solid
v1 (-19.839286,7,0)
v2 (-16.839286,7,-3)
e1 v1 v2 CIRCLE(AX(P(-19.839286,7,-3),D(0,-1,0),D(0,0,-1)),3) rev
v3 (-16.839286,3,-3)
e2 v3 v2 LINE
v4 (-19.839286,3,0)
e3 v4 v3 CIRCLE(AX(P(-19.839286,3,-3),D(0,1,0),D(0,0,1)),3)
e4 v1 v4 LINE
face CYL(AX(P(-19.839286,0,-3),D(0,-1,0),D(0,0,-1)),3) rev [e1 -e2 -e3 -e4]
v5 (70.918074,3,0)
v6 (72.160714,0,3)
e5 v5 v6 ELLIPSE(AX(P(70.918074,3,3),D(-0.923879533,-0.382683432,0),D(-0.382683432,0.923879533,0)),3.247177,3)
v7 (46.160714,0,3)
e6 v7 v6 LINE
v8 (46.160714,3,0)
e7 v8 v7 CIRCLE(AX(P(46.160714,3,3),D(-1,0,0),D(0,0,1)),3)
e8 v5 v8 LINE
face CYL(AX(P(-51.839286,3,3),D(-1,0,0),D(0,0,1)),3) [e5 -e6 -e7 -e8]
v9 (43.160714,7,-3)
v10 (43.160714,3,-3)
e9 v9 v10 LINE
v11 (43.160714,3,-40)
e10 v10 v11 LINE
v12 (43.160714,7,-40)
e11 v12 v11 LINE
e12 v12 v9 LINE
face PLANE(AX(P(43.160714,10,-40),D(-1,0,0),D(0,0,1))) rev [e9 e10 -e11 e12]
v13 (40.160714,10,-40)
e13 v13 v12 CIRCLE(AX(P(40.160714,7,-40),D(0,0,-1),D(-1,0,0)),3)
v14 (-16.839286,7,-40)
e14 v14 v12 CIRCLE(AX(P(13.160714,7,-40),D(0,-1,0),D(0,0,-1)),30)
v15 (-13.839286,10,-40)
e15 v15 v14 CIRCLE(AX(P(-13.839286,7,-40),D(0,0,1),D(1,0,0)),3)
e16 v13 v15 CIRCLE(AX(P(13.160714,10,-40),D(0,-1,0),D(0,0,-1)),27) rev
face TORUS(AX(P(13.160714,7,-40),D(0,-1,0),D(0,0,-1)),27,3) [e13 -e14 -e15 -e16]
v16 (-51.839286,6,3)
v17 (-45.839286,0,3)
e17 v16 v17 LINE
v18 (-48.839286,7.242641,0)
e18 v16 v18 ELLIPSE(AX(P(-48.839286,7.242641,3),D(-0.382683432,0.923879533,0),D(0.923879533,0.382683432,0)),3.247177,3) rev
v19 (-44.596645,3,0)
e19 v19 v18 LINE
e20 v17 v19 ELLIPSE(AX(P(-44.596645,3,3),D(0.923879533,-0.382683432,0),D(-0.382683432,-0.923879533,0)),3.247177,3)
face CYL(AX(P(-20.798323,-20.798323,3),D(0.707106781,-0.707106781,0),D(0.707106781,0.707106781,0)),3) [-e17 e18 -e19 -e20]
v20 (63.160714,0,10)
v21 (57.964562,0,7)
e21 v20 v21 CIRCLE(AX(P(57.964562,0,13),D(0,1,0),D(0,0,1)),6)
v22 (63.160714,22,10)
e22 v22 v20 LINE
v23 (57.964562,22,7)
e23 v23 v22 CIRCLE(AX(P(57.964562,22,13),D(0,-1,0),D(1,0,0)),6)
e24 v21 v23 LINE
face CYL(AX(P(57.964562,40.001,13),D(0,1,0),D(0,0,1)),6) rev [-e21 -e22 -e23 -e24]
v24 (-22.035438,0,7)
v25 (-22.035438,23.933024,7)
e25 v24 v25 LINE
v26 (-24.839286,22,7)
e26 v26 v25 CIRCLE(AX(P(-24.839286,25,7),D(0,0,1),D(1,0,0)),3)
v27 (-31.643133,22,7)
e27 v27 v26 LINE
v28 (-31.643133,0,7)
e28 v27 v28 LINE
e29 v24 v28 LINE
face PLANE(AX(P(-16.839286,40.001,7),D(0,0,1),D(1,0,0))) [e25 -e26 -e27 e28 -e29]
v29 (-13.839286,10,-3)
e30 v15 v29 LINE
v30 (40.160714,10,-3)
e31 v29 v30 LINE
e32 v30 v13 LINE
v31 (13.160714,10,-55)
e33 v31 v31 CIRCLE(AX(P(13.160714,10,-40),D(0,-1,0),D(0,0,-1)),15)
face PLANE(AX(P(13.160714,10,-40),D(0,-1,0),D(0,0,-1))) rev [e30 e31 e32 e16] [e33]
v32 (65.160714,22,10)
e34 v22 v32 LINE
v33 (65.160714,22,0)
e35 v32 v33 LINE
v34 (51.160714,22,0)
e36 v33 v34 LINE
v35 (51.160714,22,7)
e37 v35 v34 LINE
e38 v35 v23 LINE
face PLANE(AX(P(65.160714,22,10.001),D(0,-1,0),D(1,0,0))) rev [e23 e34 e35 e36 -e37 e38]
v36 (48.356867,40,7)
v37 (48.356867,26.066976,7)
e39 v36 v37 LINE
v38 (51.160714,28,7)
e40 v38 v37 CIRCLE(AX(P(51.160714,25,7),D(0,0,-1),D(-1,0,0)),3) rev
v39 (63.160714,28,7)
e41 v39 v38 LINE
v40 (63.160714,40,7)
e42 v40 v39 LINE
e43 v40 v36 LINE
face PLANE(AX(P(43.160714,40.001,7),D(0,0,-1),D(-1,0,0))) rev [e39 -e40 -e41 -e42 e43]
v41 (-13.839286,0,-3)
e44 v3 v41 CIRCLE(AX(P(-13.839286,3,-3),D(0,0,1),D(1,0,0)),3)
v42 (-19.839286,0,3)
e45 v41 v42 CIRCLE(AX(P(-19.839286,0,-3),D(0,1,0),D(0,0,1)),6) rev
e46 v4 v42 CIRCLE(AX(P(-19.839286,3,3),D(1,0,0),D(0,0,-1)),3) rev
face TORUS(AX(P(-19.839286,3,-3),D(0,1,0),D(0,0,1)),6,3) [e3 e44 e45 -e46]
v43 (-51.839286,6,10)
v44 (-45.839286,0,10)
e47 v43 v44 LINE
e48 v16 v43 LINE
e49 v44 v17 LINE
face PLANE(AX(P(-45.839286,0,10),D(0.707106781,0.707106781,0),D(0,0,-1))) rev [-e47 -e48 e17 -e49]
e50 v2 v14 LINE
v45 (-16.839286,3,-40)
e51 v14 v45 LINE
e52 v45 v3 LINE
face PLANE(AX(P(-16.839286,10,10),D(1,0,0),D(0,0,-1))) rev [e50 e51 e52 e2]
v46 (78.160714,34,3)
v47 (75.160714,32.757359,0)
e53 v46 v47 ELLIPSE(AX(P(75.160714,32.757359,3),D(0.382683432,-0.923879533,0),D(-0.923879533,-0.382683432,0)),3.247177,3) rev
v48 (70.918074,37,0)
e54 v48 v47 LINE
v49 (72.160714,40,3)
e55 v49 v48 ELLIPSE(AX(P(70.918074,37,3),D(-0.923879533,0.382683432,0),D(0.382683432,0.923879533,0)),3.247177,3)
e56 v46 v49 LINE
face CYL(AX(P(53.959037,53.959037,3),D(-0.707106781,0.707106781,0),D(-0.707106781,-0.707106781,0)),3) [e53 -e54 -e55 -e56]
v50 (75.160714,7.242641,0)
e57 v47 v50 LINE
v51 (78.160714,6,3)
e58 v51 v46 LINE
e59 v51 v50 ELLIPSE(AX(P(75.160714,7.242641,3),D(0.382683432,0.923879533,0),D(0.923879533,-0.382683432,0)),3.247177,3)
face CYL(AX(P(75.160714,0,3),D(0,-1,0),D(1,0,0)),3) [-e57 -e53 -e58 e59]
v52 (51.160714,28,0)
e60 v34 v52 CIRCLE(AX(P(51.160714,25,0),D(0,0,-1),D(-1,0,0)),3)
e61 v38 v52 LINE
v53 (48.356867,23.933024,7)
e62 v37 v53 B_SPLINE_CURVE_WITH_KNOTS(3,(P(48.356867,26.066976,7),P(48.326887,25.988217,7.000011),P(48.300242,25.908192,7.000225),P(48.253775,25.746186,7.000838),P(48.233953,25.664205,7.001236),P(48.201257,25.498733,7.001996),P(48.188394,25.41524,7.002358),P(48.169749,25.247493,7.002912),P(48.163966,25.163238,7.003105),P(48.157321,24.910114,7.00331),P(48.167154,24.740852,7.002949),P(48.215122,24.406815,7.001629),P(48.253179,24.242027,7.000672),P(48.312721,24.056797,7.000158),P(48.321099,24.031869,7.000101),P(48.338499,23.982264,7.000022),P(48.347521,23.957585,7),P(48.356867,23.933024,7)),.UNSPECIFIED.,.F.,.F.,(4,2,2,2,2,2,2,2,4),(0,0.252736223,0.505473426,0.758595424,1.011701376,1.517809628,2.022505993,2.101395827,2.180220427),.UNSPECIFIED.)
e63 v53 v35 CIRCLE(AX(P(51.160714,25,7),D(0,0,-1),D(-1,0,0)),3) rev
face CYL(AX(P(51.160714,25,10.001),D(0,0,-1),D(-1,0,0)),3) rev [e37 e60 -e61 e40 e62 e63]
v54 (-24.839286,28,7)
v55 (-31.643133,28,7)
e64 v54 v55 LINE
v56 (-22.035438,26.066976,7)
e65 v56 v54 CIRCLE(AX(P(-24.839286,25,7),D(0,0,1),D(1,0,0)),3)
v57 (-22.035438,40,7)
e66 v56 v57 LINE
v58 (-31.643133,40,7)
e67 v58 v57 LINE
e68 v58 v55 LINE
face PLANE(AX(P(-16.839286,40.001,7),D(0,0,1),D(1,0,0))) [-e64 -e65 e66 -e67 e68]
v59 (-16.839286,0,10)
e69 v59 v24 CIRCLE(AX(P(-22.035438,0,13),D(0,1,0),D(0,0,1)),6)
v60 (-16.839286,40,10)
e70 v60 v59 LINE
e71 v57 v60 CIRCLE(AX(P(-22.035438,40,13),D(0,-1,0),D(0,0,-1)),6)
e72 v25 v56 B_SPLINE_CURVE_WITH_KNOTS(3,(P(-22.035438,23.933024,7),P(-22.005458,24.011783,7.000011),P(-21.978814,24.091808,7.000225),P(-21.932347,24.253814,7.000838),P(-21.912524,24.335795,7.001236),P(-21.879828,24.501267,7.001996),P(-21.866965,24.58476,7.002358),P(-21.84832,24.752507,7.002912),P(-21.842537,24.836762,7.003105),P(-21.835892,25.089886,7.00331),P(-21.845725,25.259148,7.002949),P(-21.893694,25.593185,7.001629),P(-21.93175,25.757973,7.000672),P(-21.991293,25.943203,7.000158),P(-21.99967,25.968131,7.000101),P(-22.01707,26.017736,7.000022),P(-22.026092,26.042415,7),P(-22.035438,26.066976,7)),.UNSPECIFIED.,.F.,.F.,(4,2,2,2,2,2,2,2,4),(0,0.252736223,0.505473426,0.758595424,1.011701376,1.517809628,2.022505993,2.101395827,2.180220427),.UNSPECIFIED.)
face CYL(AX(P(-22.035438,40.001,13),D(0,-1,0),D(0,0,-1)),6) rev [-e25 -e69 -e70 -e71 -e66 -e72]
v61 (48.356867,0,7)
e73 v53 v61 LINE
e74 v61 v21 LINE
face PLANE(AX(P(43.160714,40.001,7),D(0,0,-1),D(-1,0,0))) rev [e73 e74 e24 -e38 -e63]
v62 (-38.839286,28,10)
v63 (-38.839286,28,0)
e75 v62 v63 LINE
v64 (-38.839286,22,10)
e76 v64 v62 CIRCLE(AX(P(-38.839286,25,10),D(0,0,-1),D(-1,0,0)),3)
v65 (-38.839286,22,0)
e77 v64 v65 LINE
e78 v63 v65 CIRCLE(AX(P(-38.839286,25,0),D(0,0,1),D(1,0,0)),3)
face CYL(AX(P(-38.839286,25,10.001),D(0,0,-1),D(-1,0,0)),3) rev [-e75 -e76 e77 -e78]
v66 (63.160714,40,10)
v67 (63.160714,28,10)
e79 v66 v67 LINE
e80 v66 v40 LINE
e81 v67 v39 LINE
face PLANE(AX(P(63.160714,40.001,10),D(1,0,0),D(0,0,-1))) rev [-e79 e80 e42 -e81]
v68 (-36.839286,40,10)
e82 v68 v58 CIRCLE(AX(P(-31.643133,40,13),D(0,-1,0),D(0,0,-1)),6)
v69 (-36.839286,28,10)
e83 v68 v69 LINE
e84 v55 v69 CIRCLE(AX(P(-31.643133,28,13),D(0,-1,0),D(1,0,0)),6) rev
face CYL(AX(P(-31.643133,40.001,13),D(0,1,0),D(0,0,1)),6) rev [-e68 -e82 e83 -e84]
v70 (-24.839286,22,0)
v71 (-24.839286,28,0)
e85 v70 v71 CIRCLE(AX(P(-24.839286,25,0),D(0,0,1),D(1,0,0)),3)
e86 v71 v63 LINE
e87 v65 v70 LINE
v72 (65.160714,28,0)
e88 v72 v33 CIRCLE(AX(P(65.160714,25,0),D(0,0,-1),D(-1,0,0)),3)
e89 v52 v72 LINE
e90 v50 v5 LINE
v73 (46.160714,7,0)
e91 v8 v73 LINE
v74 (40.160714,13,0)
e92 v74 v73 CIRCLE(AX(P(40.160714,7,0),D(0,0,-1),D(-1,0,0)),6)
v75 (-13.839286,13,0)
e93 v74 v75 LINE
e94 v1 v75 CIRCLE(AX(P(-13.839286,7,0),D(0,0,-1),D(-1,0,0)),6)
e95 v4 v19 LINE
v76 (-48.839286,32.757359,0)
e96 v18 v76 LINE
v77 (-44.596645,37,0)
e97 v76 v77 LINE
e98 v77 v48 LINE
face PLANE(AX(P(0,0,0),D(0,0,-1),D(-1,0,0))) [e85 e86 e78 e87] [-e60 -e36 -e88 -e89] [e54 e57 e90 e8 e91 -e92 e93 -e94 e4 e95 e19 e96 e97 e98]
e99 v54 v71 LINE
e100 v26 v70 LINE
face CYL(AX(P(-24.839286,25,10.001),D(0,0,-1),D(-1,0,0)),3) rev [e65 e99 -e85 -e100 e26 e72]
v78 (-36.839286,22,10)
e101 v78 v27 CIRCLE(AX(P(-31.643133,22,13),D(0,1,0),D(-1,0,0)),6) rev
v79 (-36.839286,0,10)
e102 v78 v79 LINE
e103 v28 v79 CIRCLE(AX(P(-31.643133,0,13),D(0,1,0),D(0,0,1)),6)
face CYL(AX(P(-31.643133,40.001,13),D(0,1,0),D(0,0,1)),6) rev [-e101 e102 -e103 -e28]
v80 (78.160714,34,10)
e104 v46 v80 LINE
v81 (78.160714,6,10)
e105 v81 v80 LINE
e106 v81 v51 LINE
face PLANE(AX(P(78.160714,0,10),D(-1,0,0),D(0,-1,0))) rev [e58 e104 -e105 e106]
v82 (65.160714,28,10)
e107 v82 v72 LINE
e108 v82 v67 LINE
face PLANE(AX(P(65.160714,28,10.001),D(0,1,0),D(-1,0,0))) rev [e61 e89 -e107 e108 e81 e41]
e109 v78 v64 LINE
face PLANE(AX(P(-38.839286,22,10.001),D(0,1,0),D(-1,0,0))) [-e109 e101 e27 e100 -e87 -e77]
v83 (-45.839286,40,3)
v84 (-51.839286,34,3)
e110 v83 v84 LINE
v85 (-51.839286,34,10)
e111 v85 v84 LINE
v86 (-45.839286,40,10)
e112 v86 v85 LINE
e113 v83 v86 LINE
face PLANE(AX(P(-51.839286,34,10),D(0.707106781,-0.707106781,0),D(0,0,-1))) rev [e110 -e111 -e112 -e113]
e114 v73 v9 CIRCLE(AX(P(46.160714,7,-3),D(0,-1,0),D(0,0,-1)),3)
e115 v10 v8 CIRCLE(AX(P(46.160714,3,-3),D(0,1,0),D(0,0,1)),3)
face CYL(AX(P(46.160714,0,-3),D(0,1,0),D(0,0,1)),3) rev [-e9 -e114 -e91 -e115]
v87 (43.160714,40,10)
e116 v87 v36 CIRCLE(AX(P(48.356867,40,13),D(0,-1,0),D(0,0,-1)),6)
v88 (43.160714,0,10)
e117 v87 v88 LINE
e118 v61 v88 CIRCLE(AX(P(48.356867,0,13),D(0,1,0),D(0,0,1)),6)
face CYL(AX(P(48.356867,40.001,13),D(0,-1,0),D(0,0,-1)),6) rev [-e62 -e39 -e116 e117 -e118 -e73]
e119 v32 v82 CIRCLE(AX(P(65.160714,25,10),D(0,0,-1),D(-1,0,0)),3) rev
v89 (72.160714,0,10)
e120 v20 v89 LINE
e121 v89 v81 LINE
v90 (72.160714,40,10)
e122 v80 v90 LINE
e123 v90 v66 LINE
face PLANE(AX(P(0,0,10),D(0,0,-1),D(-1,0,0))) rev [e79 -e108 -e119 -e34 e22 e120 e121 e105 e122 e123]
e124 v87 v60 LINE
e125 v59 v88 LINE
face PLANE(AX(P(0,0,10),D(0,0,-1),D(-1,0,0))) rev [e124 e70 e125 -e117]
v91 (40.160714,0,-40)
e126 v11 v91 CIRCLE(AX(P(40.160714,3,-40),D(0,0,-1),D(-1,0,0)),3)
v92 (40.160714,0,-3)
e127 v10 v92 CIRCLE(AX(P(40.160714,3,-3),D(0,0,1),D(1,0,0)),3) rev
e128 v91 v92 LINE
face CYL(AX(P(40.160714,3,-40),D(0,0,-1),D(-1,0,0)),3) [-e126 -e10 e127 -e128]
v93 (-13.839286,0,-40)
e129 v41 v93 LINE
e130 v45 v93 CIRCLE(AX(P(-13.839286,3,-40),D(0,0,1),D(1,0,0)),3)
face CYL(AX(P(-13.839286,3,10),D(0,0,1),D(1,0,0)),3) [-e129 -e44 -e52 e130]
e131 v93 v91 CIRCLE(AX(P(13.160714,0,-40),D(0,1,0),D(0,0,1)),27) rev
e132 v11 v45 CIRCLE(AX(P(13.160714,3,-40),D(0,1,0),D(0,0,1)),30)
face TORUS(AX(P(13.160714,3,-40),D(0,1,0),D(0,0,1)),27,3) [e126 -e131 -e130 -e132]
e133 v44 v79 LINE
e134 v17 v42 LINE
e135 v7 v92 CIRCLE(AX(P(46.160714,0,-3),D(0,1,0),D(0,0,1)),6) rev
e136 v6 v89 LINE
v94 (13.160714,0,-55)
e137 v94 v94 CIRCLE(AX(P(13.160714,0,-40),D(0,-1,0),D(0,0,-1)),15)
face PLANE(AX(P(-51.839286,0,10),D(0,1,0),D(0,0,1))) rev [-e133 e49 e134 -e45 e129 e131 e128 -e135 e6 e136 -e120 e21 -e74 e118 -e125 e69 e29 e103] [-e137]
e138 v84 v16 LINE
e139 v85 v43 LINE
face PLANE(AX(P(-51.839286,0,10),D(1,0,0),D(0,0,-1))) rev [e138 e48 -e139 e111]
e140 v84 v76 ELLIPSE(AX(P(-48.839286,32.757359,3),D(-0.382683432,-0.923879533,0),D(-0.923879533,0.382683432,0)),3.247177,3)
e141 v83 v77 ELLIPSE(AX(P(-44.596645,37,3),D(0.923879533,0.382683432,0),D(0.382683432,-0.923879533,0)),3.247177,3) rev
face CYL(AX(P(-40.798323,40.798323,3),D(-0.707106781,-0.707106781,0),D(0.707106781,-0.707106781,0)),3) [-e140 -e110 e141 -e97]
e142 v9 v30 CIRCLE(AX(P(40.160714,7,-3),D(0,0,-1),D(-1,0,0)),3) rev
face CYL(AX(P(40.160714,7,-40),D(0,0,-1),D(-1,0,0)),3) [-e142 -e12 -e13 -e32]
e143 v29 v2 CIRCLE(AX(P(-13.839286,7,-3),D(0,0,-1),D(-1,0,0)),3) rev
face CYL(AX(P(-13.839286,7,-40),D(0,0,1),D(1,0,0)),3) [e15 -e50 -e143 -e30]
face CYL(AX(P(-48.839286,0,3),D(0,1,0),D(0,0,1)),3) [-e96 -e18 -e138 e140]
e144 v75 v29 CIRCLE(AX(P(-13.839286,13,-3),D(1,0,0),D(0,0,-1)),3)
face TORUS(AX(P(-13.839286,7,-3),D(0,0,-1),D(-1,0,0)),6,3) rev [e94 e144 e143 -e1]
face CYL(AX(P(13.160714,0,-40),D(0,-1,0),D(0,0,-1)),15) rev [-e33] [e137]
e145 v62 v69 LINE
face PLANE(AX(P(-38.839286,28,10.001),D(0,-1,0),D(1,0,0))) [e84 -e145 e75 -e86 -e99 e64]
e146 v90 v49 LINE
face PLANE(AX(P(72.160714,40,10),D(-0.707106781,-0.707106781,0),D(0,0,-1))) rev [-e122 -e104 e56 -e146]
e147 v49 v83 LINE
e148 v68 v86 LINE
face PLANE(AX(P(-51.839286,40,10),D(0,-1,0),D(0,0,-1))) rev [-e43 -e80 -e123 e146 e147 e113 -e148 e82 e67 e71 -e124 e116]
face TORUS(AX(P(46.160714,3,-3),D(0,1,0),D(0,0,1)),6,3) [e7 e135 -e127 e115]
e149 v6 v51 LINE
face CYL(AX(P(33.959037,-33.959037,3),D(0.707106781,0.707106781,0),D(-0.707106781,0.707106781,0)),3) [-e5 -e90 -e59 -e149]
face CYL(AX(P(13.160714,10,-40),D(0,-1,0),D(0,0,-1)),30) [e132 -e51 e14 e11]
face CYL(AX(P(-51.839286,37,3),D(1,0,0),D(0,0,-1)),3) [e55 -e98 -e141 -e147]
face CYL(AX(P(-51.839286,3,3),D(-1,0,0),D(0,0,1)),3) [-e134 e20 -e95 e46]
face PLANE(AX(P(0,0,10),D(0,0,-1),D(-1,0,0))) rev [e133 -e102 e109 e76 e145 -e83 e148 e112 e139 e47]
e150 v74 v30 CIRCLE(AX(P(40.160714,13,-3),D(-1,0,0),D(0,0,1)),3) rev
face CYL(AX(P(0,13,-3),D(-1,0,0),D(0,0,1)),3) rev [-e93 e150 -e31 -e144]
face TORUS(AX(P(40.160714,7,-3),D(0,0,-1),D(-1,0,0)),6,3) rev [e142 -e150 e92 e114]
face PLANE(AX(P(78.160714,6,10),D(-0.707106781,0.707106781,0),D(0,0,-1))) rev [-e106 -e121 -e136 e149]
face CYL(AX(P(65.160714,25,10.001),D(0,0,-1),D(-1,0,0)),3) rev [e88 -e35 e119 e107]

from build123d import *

# Parameters (mm, degrees)
ESQUISSE1_W             = 130
ESQUISSE1_H             = 40
BASE_DEPTH              = 10
CHANFREIN1_SIZE         = 6
CHANFREIN2_SIZE         = 6
LANGUETTE_EXT_DEPTH     = 10
D_GAGEMENT_M31_D        = 30
ENL_V_MAT_EXTRU_1_REACH = 114.29
ESQUISSE5_W             = 20
ESQUISSE5_H             = 3
RAINURE_REACH           = 114.29
CONGES3MM_R             = 3
CONGES6MM_R             = 6


with BuildPart() as part:
    # Esquisse1 → Base (new body)
    with BuildSketch(Plane.XY):
        with Locations((13.160714286, 20)):
            Rectangle(ESQUISSE1_W, ESQUISSE1_H)
    extrude(amount=BASE_DEPTH)

    # Chanfrein1
    chanfrein1_edges = [part.edges().sort_by_distance(p)[0] for p in [
        (78.160714286, 0, 5),
    ]]
    chamfer(chanfrein1_edges, length=CHANFREIN1_SIZE)

    # Chanfrein2
    chanfrein2_edges = [part.edges().sort_by_distance(p)[0] for p in [
        (-51.839285714, 40, 5),
        (78.160714286, 40, 5),
        (-51.839285714, 0, 5),
    ]]
    chamfer(chanfrein2_edges, length=CHANFREIN2_SIZE)

    # languette → Languette_Ext (add)
    with BuildSketch(Plane(origin=(0, 0, 0), x_dir=(1, 0, 0), z_dir=(0, 1, 0))):
        with BuildLine():
            Line((-16.839285714, -10), (-16.839285714, 40))
            ThreePointArc((-16.839285714, 40), (13.160714286, 70), (43.160714286, 40))
            Line((43.160714286, 40), (43.160714286, -10))
            Line((43.160714286, -10), (-16.839285714, -10))
        make_face()
    extrude(amount=LANGUETTE_EXT_DEPTH)

    # Dégagement M31 (through all)
    with Locations(Plane(origin=(0, 0, 0), x_dir=(-1, 0, 0), z_dir=(0, -1, 0))):
        with Locations((-13.160714286, 40)):
            Hole(D_GAGEMENT_M31_D / 2)

    # Esquisse5 → Enlèv. mat.-Extru.1 (cut, up to next)
    with BuildSketch(Plane.XZ, mode=Mode.PRIVATE) as enl_v_mat_extru_1_sk1:
        with Locations((53.160714286, 8.5)):
            Rectangle(ESQUISSE5_W, ESQUISSE5_H)
    enl_v_mat_extru_1_tool1 = extrude(enl_v_mat_extru_1_sk1.sketch, amount=-ENL_V_MAT_EXTRU_1_REACH, mode=Mode.PRIVATE) & part.part
    enl_v_mat_extru_1 = enl_v_mat_extru_1_tool1.solids().sort_by_distance((53.160714, 0, 8.5))[0]
    add(enl_v_mat_extru_1, mode=Mode.SUBTRACT)

    # Symétrie1: Enlèv. mat.-Extru.1 across plane
    add(enl_v_mat_extru_1.mirror(Plane(origin=(13.160714286, 0, 0), x_dir=(0, 0, 1), z_dir=(1, 0, 0))), mode=Mode.SUBTRACT)

    # Esquisse7 → Rainure (cut, up to next)
    with BuildSketch(Plane(origin=(0, 0, 0), x_dir=(-1, 0, 0), z_dir=(0, 0, -1)), mode=Mode.PRIVATE) as rainure_sk1:
        with BuildLine():
            Line((-65.160714286, 28), (-51.160714286, 28))
            ThreePointArc((-51.160714286, 28), (-48.160714286, 25), (-51.160714286, 22))
            Line((-51.160714286, 22), (-65.160714286, 22))
            ThreePointArc((-65.160714286, 22), (-68.160714286, 25), (-65.160714286, 28))
        make_face()
    rainure_tool1 = extrude(rainure_sk1.sketch, amount=-RAINURE_REACH, mode=Mode.PRIVATE) & part.part
    rainure = rainure_tool1.solids().sort_by_distance((58.160714, 25, 0))[0]
    add(rainure, mode=Mode.SUBTRACT)

    # Symétrie2: Rainure across plane
    add(rainure.mirror(Plane(origin=(13.160714286, 0, 0), x_dir=(0, 0, 1), z_dir=(1, 0, 0))), mode=Mode.SUBTRACT)

    # Conges3mm
    conges3mm_edges = [part.edges().sort_by_distance(p)[0] for p in [
        (78.160714286, 20, 0),
        (75.160714286, 3, 0),
        (-51.839285714, 20, 0),
        (-31.339285714, 0, 0),
        (13.160714286, 40, 0),
        (75.160714286, 37, 0),
        (-48.839285714, 3, 0),
        (-48.839285714, 37, 0),
        (57.660714286, 0, 0),
        (13.160714286, 10, 0),
        (-16.839285714, 5, 0),
        (43.160714286, 5, 0),
        (43.160714286, 0, -20),
        (13.160714286, 0, -70),
        (-16.839285714, 0, -20),
        (43.160714286, 10, -20),
        (13.160714286, 10, -70),
        (-16.839285714, 10, -20),
    ]]
    fillet(conges3mm_edges, radius=CONGES3MM_R)

    # Conges6mm
    # the kernel refuses this fillet: 6 mm, written as the material it adds along each edge
    with BuildSketch(Plane(origin=(-36.839285714, 15.009618943, 7), x_dir=(1, 0, 0), z_dir=(0, 1, 0))) as conges6mm_piece_1_section:
        with BuildLine():
            CenterArc((5.196152423, -6), CONGES6MM_R, 90, 60)
            Line((0, -3), (0, 0))
            Line((0, 0), (5.196152423, 0))
        make_face()
    conges6mm_piece_1 = extrude(amount=37.980762114, mode=Mode.PRIVATE)
    conges6mm_piece_1 = split(conges6mm_piece_1, bisect_by=Plane(origin=(-34.649133292, 22, 7.793455272), z_dir=(0, -1, 0)), keep=Keep.TOP, mode=Mode.PRIVATE)
    add(conges6mm_piece_1)
    with BuildSketch(Plane(origin=(-36.839285714, 28, 7), x_dir=(1, 0, 0), z_dir=(0, 1, 0))) as conges6mm_piece_2:
        with BuildLine():
            CenterArc((5.196152423, -6), CONGES6MM_R, 90, 60)
            Line((0, -3), (0, 0))
            Line((0, 0), (5.196152423, 0))
        make_face()
    extrude(amount=12)
    with BuildSketch(Plane(origin=(-36.839285714, 0, 7), x_dir=(1, 0, 0), z_dir=(0, 1, 0))) as conges6mm_piece_3:
        with BuildLine():
            CenterArc((5.196152423, -6), CONGES6MM_R, 90, 60)
            Line((0, -3), (0, 0))
            Line((0, 0), (5.196152423, 0))
        make_face()
    extrude(amount=22)
    with BuildSketch(Plane(origin=(-36.839285714, -12.990381057, 7), x_dir=(1, 0, 0), z_dir=(0, 1, 0))) as conges6mm_piece_4_section:
        with BuildLine():
            CenterArc((5.196152423, -6), CONGES6MM_R, 90, 60)
            Line((0, -3), (0, 0))
            Line((0, 0), (5.196152423, 0))
        make_face()
    conges6mm_piece_4 = extrude(amount=47.980762114, mode=Mode.PRIVATE)
    conges6mm_piece_4 = split(conges6mm_piece_4, bisect_by=Plane(origin=(-34.649133292, 28, 7.793455272), z_dir=(0, 1, 0)), keep=Keep.TOP, mode=Mode.PRIVATE)
    add(conges6mm_piece_4)
    with BuildSketch(Plane(origin=(-16.839285714, 0, 7), x_dir=(0, 0, 1), z_dir=(0, 1, 0))) as conges6mm_piece_5_section:
        with BuildLine():
            CenterArc((6, -5.196152423), CONGES6MM_R, 120, 60)
            Line((0, -5.196152423), (0, 0))
            Line((0, 0), (3, 0))
        make_face()
    conges6mm_piece_5 = extrude(amount=40, mode=Mode.PRIVATE)
    conges6mm_piece_5 = conges6mm_piece_5 - Plane(origin=(-24.839285714, 25, 7.793455272), x_dir=(0, 1, 0), z_dir=(0, 0, -1)) * Cylinder(3, 101, mode=Mode.PRIVATE)
    add(conges6mm_piece_5)
    with BuildSketch(Plane(origin=(43.160714286, 0, 7), x_dir=(1, 0, 0), z_dir=(0, 1, 0))) as conges6mm_piece_6_section:
        with BuildLine():
            CenterArc((5.196152423, -6), CONGES6MM_R, 90, 60)
            Line((0, -3), (0, 0))
            Line((0, 0), (5.196152423, 0))
        make_face()
    conges6mm_piece_6 = extrude(amount=40, mode=Mode.PRIVATE)
    conges6mm_piece_6 = conges6mm_piece_6 - Plane(origin=(51.160714286, 25, 7.793455272), x_dir=(0, 1, 0), z_dir=(0, 0, -1)) * Cylinder(3, 101, mode=Mode.PRIVATE)
    add(conges6mm_piece_6)
    with BuildSketch(Plane(origin=(63.160714286, 0, 7), x_dir=(0, 0, 1), z_dir=(0, 1, 0))) as conges6mm_piece_7:
        with BuildLine():
            CenterArc((6, -5.196152423), CONGES6MM_R, 120, 60)
            Line((0, -5.196152423), (0, 0))
            Line((0, 0), (3, 0))
        make_face()
    extrude(amount=22)


solid = part.part
